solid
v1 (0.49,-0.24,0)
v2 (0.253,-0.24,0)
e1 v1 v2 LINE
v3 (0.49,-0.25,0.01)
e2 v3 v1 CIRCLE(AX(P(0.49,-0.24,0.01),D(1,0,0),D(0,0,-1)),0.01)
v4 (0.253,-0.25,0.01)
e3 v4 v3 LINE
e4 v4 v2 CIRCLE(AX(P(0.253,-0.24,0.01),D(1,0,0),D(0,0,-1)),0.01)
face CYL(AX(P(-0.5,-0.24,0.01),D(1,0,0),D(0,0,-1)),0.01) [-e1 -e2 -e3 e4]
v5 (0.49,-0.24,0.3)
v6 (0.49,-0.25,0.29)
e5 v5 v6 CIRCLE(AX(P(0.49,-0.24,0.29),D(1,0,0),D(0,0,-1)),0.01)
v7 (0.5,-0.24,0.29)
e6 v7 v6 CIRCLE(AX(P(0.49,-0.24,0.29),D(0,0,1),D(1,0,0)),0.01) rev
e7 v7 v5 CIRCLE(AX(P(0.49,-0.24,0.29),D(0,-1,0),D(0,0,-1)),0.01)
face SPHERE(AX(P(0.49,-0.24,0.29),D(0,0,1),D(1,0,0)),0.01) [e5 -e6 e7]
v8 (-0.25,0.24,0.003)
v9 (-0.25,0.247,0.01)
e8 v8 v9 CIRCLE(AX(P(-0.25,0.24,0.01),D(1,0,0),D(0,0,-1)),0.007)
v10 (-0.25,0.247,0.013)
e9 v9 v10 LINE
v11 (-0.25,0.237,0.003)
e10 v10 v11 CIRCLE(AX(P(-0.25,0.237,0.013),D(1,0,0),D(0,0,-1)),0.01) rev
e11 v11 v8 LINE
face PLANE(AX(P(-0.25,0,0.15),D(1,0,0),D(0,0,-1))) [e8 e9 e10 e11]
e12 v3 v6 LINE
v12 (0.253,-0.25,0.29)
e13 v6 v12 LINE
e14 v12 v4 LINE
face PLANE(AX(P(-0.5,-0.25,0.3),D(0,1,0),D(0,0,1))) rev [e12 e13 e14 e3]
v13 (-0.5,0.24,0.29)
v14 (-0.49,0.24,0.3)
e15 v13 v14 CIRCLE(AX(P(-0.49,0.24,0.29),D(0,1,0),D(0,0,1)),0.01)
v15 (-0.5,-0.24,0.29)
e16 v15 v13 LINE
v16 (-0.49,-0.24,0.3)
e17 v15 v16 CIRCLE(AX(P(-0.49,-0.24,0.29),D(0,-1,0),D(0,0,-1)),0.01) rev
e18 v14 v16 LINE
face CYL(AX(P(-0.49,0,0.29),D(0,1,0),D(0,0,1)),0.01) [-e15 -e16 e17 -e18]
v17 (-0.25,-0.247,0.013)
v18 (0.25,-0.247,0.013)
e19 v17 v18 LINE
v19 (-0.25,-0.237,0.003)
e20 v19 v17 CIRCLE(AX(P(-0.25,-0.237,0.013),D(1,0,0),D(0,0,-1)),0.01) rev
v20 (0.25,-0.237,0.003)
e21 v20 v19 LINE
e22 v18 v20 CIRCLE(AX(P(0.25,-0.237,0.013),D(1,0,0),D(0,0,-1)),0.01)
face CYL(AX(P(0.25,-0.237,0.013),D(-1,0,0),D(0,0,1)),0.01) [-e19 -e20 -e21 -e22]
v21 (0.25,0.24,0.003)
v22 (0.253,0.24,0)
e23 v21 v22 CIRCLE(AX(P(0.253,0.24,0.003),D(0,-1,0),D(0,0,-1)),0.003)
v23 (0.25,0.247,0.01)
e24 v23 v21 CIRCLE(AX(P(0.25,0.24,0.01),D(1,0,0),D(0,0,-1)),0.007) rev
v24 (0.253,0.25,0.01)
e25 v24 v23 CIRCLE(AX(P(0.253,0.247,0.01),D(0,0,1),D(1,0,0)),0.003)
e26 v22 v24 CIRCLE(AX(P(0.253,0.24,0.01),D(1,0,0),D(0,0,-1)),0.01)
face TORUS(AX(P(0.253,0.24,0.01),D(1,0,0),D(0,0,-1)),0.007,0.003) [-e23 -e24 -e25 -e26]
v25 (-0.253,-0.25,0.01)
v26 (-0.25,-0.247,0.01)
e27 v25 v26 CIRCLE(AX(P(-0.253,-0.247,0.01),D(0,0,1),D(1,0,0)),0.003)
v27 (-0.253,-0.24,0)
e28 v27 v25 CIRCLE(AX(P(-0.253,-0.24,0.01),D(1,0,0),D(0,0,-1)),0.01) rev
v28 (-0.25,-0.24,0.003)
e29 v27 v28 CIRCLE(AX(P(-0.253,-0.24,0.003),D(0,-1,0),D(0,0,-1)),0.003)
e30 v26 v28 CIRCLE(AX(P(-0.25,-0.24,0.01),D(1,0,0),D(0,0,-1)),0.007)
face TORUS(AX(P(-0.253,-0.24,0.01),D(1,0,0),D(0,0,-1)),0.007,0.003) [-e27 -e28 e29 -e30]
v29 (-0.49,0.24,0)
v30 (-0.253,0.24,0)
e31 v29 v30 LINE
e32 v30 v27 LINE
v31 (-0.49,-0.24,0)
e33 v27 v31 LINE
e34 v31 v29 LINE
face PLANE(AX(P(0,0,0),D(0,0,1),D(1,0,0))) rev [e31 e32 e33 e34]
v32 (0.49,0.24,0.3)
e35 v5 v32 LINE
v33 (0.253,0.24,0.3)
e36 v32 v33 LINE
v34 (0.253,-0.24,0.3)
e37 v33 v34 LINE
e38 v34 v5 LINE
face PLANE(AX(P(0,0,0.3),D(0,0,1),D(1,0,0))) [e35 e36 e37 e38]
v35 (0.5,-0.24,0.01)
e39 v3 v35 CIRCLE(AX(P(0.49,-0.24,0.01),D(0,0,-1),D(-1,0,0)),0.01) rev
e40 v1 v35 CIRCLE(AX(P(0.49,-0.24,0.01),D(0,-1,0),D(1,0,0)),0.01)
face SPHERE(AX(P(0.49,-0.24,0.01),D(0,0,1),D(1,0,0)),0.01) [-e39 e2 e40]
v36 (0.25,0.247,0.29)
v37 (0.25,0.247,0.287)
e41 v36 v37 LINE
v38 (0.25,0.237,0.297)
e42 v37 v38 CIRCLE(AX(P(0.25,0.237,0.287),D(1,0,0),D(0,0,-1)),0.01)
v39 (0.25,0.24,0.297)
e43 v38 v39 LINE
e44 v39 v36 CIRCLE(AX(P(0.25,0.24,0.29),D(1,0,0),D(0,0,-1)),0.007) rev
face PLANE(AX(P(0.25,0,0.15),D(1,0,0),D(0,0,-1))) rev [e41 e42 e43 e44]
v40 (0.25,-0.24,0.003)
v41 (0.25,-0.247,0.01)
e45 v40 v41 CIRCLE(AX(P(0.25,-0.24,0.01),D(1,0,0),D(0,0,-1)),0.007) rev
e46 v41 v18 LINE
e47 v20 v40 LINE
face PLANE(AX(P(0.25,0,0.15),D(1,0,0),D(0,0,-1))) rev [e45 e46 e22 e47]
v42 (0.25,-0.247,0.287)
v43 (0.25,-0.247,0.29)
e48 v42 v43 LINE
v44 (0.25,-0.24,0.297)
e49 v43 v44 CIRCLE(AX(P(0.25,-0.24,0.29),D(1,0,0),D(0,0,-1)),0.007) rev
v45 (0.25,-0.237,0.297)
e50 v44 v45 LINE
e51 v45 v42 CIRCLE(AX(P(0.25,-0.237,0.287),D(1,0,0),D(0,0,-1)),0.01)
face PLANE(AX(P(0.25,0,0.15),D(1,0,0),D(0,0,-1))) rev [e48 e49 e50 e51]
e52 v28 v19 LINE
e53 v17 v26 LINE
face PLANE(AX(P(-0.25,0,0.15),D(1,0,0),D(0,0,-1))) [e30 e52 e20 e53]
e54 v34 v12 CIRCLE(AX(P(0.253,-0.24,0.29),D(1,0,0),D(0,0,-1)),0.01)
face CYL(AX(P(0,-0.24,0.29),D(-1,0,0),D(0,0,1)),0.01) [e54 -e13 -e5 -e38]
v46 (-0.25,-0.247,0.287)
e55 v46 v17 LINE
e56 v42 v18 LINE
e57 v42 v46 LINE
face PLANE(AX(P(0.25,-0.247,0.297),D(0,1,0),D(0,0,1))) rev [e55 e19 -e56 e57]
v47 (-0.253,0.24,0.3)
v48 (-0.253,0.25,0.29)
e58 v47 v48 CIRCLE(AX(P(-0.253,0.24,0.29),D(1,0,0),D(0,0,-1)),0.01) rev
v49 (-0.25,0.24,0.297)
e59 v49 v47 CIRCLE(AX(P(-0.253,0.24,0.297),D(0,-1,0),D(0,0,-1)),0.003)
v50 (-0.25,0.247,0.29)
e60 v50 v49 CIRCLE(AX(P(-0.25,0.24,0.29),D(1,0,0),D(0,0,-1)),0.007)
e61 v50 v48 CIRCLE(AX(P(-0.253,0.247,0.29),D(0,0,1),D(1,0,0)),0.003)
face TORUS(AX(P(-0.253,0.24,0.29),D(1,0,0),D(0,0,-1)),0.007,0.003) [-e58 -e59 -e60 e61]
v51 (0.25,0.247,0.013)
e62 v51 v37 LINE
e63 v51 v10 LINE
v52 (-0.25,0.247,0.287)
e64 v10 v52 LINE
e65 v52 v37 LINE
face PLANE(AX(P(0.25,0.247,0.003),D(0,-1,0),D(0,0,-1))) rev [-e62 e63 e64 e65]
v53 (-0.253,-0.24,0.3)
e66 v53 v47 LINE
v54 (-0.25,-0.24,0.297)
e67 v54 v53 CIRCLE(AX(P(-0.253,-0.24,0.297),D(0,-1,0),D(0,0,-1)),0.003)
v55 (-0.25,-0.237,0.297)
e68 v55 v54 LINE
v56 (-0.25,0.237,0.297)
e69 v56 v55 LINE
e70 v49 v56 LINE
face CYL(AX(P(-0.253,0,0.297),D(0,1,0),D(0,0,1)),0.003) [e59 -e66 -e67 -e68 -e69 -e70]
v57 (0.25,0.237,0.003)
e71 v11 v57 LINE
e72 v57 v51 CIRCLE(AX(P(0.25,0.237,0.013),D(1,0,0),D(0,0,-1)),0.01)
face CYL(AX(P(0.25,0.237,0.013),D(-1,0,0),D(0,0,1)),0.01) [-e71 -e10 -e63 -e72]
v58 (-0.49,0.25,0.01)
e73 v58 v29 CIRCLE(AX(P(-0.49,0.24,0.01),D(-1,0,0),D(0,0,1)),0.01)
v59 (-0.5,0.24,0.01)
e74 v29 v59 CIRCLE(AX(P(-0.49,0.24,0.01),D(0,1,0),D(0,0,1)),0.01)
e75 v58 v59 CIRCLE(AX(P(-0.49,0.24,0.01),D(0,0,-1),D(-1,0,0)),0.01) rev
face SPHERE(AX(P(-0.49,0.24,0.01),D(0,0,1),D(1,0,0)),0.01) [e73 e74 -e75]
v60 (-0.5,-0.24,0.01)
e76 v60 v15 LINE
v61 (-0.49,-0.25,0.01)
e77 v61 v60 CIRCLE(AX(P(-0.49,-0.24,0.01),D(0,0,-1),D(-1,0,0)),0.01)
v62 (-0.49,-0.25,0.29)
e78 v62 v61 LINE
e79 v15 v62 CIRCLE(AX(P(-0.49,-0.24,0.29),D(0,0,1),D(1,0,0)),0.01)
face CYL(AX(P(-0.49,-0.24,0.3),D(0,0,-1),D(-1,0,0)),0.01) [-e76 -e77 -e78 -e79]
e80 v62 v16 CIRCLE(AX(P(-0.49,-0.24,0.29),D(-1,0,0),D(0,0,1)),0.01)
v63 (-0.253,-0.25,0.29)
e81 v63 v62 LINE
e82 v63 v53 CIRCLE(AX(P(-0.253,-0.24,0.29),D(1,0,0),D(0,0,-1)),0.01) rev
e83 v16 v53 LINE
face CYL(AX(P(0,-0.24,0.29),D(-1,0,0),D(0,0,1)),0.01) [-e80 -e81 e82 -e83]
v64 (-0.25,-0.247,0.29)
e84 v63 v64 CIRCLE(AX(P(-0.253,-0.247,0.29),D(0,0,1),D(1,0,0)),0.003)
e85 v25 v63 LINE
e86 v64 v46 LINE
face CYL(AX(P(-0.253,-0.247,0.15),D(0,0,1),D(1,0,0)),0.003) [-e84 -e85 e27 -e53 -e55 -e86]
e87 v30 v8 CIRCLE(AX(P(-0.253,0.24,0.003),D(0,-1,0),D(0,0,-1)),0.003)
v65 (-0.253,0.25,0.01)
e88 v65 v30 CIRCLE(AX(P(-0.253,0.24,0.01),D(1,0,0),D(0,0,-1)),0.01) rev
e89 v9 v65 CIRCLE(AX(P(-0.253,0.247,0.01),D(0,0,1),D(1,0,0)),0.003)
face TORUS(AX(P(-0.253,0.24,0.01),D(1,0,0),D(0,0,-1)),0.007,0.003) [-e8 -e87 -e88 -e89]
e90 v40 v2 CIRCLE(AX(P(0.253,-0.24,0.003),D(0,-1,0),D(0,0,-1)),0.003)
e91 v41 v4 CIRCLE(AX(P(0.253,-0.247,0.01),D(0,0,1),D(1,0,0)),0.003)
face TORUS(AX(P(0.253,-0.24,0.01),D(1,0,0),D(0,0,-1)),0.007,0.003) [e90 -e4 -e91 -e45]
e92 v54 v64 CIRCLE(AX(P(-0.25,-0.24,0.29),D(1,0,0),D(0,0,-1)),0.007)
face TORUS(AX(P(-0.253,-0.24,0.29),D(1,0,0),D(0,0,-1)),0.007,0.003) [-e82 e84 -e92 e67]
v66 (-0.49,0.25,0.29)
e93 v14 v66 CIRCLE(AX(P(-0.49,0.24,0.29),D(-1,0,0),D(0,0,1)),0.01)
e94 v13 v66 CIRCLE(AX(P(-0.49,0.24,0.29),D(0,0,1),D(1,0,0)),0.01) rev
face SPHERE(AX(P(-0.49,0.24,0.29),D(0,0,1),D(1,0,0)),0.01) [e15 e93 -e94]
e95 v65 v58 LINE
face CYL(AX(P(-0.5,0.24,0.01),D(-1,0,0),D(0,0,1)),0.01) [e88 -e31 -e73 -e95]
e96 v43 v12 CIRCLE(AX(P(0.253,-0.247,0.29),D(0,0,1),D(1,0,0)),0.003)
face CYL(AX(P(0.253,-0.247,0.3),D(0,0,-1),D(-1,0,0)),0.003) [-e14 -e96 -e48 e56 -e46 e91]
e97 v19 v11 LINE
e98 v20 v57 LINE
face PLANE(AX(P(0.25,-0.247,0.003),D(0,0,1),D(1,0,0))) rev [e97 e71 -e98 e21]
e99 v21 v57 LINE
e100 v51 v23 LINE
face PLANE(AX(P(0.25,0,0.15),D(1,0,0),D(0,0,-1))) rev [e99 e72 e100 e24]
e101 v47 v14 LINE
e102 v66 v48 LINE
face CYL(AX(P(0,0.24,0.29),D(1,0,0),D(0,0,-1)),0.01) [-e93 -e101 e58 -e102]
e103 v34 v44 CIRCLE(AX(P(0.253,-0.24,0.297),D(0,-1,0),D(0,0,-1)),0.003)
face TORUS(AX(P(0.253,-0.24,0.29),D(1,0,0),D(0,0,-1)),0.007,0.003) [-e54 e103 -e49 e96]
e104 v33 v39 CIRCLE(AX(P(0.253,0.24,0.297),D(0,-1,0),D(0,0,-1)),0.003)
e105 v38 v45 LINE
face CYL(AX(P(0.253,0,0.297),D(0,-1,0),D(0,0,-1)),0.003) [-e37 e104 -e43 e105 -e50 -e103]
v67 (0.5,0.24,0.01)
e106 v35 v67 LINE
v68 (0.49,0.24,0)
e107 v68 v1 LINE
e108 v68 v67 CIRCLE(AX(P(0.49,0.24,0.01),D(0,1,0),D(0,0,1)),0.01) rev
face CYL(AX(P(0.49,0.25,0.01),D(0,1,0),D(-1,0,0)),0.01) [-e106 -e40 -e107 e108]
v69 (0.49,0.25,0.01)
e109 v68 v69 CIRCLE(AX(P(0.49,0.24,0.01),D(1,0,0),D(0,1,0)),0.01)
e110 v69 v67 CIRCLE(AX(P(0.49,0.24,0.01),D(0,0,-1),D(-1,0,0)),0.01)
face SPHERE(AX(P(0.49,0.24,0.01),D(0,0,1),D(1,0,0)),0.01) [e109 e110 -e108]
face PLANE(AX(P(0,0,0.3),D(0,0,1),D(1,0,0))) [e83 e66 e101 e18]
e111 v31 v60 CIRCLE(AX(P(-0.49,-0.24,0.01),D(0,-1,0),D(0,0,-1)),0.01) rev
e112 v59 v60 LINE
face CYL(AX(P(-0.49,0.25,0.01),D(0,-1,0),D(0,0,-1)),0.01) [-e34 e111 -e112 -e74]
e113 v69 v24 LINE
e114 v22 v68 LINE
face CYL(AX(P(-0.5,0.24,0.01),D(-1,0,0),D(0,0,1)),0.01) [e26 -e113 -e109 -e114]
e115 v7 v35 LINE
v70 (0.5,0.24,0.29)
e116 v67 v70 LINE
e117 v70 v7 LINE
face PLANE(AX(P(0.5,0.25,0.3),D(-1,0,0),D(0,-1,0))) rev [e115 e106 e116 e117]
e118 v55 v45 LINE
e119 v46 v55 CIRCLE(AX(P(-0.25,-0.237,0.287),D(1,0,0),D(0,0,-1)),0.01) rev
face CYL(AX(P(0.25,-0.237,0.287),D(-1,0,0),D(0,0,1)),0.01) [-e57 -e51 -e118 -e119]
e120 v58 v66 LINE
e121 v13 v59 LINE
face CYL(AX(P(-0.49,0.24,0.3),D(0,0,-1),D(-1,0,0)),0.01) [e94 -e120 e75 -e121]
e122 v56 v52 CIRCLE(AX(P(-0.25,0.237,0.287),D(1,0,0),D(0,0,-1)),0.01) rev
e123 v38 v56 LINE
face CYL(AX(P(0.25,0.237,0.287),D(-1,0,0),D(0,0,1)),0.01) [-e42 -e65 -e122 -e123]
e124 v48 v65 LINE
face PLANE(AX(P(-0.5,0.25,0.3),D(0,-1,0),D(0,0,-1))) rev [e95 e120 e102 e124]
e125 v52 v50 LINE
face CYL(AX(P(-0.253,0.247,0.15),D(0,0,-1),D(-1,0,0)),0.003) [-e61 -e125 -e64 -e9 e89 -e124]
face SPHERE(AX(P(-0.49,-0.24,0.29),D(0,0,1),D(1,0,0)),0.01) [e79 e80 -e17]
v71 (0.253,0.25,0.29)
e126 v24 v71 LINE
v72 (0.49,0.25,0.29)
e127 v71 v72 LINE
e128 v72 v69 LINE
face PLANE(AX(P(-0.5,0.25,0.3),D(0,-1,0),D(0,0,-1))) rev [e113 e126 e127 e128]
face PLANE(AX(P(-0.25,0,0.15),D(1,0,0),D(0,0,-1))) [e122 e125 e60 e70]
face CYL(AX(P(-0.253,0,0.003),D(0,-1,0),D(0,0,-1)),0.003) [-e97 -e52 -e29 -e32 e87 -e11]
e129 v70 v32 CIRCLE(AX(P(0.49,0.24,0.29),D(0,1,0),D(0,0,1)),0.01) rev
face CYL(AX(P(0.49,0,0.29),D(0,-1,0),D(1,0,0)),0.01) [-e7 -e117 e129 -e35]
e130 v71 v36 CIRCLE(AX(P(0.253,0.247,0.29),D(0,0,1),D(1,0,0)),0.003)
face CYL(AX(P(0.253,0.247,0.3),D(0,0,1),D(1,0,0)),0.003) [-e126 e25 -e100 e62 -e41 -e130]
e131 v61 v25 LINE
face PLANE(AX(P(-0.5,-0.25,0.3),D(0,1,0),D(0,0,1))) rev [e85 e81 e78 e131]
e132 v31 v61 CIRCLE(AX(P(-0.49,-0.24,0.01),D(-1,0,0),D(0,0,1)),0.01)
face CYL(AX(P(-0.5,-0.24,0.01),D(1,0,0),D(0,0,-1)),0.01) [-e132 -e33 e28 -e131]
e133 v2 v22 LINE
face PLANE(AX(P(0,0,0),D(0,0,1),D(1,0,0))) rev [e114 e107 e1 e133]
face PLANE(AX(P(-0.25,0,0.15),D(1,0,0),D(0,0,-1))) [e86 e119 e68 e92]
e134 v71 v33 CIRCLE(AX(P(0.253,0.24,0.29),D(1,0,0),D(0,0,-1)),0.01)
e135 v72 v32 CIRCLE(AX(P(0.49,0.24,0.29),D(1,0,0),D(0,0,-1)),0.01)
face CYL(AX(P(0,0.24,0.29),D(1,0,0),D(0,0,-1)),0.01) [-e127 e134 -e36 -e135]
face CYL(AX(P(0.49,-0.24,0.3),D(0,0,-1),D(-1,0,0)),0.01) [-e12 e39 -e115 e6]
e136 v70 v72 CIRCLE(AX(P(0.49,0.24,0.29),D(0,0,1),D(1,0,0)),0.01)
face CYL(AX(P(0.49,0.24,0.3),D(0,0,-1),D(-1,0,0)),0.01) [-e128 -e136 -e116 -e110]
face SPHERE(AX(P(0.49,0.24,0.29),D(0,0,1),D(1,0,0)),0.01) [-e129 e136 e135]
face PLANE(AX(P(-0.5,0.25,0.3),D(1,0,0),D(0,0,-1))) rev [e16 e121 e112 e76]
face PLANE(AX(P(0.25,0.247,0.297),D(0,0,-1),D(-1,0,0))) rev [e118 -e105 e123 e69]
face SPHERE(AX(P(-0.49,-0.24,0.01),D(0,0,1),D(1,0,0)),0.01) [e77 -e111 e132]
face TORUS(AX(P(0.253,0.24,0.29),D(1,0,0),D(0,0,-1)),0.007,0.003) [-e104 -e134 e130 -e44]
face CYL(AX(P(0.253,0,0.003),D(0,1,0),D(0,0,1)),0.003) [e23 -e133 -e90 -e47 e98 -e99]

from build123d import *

# Parameters (mm, degrees)
SKETCH1_W                           = 1
SKETCH1_H                           = 0.5
ALL_BODY_DEPTH                      = 0.3
CUT_OUT_THE_BODY_FOR_PIN_DEPTH      = 0.25
CUT_OUT_THE_BODY_FOR_PIN_DEPTH_BACK = 0.25
SKETCH2_OUTSIDE_W                   = 2.532
SKETCH2_OUTSIDE_H                   = 2.732
SKETCH2_OUTSIDE_W_2                 = 0.294
SKETCH2_OUTSIDE_H_2                 = 0.494
BODY_FILLET_R                       = 0.01
PIN_FILLET_A_R                      = 0.01
PIN_FILLET_B_R                      = 0.003


with BuildPart() as part:
    # Sketch1 → All body (new body)
    with BuildSketch(Plane.XY):
        Rectangle(SKETCH1_W, SKETCH1_H)
    extrude(amount=ALL_BODY_DEPTH)

    # Sketch2 outside → Cut out the body for pin (cut, two sides: drawn at the far end of the back side and taken through both)
    with BuildSketch(Plane(origin=(0, 0, 0), x_dir=(0, 0, -1), z_dir=(1, 0, 0)).offset(-CUT_OUT_THE_BODY_FOR_PIN_DEPTH_BACK)):
        with Locations((-0.15, 0)):
            Rectangle(SKETCH2_OUTSIDE_W, SKETCH2_OUTSIDE_H)
        with Locations((-0.15, 0)):
            Rectangle(SKETCH2_OUTSIDE_W_2, SKETCH2_OUTSIDE_H_2, mode=Mode.SUBTRACT)
    extrude(amount=CUT_OUT_THE_BODY_FOR_PIN_DEPTH + CUT_OUT_THE_BODY_FOR_PIN_DEPTH_BACK, mode=Mode.SUBTRACT)

    # Body fillet
    body_fillet_edges = [part.edges().sort_by_distance(p)[0] for p in [
        (0, 0.247, 0.003),
        (0, 0.247, 0.297),
        (0, -0.247, 0.297),
        (0, -0.247, 0.003),
    ]]
    fillet(body_fillet_edges, radius=BODY_FILLET_R)

    # Pin fillet a
    pin_fillet_a_edges = [part.edges().sort_by_distance(p)[0] for p in [
        (0.5, 0, 0.3),
        (-0.375, 0.25, 0),
        (0.375, -0.25, 0),
        (0.375, -0.25, 0.3),
        (-0.375, 0.25, 0.3),
        (0.375, 0.25, 0.3),
        (-0.5, 0, 0.3),
        (0.375, 0.25, 0),
        (0.5, 0, 0),
        (-0.375, -0.25, 0),
        (-0.5, 0, 0),
        (-0.5, 0.25, 0.15),
        (0.5, 0.25, 0.15),
        (0.5, -0.25, 0.15),
        (-0.5, -0.25, 0.15),
        (-0.375, -0.25, 0.3),
    ]]
    fillet(pin_fillet_a_edges, radius=PIN_FILLET_A_R)

    # Pin fillet b
    pin_fillet_b_edges = [part.edges().sort_by_distance(p)[0] for p in [
        (0.25, -0.25, 0.15),
        (0.25, 0, 0.3),
        (0.25, 0.25, 0.15),
        (0.25, 0, 0),
        (-0.25, 0.25, 0.15),
        (-0.25, 0, 0.3),
        (-0.25, -0.25, 0.15),
        (-0.25, 0, 0),
        (0.25, 0.247071068, 0.002928932),
        (0.25, -0.247071068, 0.002928932),
        (0.25, -0.247071068, 0.297071068),
        (0.25, 0.247071068, 0.297071068),
        (-0.25, -0.247071068, 0.297071068),
        (-0.25, 0.247071068, 0.297071068),
        (-0.25, -0.247071068, 0.002928932),
        (-0.25, 0.247071068, 0.002928932),
    ]]
    fillet(pin_fillet_b_edges, radius=PIN_FILLET_B_R - 0.0001)  # a hair under: the kernel refuses the full size


solid = part.part
